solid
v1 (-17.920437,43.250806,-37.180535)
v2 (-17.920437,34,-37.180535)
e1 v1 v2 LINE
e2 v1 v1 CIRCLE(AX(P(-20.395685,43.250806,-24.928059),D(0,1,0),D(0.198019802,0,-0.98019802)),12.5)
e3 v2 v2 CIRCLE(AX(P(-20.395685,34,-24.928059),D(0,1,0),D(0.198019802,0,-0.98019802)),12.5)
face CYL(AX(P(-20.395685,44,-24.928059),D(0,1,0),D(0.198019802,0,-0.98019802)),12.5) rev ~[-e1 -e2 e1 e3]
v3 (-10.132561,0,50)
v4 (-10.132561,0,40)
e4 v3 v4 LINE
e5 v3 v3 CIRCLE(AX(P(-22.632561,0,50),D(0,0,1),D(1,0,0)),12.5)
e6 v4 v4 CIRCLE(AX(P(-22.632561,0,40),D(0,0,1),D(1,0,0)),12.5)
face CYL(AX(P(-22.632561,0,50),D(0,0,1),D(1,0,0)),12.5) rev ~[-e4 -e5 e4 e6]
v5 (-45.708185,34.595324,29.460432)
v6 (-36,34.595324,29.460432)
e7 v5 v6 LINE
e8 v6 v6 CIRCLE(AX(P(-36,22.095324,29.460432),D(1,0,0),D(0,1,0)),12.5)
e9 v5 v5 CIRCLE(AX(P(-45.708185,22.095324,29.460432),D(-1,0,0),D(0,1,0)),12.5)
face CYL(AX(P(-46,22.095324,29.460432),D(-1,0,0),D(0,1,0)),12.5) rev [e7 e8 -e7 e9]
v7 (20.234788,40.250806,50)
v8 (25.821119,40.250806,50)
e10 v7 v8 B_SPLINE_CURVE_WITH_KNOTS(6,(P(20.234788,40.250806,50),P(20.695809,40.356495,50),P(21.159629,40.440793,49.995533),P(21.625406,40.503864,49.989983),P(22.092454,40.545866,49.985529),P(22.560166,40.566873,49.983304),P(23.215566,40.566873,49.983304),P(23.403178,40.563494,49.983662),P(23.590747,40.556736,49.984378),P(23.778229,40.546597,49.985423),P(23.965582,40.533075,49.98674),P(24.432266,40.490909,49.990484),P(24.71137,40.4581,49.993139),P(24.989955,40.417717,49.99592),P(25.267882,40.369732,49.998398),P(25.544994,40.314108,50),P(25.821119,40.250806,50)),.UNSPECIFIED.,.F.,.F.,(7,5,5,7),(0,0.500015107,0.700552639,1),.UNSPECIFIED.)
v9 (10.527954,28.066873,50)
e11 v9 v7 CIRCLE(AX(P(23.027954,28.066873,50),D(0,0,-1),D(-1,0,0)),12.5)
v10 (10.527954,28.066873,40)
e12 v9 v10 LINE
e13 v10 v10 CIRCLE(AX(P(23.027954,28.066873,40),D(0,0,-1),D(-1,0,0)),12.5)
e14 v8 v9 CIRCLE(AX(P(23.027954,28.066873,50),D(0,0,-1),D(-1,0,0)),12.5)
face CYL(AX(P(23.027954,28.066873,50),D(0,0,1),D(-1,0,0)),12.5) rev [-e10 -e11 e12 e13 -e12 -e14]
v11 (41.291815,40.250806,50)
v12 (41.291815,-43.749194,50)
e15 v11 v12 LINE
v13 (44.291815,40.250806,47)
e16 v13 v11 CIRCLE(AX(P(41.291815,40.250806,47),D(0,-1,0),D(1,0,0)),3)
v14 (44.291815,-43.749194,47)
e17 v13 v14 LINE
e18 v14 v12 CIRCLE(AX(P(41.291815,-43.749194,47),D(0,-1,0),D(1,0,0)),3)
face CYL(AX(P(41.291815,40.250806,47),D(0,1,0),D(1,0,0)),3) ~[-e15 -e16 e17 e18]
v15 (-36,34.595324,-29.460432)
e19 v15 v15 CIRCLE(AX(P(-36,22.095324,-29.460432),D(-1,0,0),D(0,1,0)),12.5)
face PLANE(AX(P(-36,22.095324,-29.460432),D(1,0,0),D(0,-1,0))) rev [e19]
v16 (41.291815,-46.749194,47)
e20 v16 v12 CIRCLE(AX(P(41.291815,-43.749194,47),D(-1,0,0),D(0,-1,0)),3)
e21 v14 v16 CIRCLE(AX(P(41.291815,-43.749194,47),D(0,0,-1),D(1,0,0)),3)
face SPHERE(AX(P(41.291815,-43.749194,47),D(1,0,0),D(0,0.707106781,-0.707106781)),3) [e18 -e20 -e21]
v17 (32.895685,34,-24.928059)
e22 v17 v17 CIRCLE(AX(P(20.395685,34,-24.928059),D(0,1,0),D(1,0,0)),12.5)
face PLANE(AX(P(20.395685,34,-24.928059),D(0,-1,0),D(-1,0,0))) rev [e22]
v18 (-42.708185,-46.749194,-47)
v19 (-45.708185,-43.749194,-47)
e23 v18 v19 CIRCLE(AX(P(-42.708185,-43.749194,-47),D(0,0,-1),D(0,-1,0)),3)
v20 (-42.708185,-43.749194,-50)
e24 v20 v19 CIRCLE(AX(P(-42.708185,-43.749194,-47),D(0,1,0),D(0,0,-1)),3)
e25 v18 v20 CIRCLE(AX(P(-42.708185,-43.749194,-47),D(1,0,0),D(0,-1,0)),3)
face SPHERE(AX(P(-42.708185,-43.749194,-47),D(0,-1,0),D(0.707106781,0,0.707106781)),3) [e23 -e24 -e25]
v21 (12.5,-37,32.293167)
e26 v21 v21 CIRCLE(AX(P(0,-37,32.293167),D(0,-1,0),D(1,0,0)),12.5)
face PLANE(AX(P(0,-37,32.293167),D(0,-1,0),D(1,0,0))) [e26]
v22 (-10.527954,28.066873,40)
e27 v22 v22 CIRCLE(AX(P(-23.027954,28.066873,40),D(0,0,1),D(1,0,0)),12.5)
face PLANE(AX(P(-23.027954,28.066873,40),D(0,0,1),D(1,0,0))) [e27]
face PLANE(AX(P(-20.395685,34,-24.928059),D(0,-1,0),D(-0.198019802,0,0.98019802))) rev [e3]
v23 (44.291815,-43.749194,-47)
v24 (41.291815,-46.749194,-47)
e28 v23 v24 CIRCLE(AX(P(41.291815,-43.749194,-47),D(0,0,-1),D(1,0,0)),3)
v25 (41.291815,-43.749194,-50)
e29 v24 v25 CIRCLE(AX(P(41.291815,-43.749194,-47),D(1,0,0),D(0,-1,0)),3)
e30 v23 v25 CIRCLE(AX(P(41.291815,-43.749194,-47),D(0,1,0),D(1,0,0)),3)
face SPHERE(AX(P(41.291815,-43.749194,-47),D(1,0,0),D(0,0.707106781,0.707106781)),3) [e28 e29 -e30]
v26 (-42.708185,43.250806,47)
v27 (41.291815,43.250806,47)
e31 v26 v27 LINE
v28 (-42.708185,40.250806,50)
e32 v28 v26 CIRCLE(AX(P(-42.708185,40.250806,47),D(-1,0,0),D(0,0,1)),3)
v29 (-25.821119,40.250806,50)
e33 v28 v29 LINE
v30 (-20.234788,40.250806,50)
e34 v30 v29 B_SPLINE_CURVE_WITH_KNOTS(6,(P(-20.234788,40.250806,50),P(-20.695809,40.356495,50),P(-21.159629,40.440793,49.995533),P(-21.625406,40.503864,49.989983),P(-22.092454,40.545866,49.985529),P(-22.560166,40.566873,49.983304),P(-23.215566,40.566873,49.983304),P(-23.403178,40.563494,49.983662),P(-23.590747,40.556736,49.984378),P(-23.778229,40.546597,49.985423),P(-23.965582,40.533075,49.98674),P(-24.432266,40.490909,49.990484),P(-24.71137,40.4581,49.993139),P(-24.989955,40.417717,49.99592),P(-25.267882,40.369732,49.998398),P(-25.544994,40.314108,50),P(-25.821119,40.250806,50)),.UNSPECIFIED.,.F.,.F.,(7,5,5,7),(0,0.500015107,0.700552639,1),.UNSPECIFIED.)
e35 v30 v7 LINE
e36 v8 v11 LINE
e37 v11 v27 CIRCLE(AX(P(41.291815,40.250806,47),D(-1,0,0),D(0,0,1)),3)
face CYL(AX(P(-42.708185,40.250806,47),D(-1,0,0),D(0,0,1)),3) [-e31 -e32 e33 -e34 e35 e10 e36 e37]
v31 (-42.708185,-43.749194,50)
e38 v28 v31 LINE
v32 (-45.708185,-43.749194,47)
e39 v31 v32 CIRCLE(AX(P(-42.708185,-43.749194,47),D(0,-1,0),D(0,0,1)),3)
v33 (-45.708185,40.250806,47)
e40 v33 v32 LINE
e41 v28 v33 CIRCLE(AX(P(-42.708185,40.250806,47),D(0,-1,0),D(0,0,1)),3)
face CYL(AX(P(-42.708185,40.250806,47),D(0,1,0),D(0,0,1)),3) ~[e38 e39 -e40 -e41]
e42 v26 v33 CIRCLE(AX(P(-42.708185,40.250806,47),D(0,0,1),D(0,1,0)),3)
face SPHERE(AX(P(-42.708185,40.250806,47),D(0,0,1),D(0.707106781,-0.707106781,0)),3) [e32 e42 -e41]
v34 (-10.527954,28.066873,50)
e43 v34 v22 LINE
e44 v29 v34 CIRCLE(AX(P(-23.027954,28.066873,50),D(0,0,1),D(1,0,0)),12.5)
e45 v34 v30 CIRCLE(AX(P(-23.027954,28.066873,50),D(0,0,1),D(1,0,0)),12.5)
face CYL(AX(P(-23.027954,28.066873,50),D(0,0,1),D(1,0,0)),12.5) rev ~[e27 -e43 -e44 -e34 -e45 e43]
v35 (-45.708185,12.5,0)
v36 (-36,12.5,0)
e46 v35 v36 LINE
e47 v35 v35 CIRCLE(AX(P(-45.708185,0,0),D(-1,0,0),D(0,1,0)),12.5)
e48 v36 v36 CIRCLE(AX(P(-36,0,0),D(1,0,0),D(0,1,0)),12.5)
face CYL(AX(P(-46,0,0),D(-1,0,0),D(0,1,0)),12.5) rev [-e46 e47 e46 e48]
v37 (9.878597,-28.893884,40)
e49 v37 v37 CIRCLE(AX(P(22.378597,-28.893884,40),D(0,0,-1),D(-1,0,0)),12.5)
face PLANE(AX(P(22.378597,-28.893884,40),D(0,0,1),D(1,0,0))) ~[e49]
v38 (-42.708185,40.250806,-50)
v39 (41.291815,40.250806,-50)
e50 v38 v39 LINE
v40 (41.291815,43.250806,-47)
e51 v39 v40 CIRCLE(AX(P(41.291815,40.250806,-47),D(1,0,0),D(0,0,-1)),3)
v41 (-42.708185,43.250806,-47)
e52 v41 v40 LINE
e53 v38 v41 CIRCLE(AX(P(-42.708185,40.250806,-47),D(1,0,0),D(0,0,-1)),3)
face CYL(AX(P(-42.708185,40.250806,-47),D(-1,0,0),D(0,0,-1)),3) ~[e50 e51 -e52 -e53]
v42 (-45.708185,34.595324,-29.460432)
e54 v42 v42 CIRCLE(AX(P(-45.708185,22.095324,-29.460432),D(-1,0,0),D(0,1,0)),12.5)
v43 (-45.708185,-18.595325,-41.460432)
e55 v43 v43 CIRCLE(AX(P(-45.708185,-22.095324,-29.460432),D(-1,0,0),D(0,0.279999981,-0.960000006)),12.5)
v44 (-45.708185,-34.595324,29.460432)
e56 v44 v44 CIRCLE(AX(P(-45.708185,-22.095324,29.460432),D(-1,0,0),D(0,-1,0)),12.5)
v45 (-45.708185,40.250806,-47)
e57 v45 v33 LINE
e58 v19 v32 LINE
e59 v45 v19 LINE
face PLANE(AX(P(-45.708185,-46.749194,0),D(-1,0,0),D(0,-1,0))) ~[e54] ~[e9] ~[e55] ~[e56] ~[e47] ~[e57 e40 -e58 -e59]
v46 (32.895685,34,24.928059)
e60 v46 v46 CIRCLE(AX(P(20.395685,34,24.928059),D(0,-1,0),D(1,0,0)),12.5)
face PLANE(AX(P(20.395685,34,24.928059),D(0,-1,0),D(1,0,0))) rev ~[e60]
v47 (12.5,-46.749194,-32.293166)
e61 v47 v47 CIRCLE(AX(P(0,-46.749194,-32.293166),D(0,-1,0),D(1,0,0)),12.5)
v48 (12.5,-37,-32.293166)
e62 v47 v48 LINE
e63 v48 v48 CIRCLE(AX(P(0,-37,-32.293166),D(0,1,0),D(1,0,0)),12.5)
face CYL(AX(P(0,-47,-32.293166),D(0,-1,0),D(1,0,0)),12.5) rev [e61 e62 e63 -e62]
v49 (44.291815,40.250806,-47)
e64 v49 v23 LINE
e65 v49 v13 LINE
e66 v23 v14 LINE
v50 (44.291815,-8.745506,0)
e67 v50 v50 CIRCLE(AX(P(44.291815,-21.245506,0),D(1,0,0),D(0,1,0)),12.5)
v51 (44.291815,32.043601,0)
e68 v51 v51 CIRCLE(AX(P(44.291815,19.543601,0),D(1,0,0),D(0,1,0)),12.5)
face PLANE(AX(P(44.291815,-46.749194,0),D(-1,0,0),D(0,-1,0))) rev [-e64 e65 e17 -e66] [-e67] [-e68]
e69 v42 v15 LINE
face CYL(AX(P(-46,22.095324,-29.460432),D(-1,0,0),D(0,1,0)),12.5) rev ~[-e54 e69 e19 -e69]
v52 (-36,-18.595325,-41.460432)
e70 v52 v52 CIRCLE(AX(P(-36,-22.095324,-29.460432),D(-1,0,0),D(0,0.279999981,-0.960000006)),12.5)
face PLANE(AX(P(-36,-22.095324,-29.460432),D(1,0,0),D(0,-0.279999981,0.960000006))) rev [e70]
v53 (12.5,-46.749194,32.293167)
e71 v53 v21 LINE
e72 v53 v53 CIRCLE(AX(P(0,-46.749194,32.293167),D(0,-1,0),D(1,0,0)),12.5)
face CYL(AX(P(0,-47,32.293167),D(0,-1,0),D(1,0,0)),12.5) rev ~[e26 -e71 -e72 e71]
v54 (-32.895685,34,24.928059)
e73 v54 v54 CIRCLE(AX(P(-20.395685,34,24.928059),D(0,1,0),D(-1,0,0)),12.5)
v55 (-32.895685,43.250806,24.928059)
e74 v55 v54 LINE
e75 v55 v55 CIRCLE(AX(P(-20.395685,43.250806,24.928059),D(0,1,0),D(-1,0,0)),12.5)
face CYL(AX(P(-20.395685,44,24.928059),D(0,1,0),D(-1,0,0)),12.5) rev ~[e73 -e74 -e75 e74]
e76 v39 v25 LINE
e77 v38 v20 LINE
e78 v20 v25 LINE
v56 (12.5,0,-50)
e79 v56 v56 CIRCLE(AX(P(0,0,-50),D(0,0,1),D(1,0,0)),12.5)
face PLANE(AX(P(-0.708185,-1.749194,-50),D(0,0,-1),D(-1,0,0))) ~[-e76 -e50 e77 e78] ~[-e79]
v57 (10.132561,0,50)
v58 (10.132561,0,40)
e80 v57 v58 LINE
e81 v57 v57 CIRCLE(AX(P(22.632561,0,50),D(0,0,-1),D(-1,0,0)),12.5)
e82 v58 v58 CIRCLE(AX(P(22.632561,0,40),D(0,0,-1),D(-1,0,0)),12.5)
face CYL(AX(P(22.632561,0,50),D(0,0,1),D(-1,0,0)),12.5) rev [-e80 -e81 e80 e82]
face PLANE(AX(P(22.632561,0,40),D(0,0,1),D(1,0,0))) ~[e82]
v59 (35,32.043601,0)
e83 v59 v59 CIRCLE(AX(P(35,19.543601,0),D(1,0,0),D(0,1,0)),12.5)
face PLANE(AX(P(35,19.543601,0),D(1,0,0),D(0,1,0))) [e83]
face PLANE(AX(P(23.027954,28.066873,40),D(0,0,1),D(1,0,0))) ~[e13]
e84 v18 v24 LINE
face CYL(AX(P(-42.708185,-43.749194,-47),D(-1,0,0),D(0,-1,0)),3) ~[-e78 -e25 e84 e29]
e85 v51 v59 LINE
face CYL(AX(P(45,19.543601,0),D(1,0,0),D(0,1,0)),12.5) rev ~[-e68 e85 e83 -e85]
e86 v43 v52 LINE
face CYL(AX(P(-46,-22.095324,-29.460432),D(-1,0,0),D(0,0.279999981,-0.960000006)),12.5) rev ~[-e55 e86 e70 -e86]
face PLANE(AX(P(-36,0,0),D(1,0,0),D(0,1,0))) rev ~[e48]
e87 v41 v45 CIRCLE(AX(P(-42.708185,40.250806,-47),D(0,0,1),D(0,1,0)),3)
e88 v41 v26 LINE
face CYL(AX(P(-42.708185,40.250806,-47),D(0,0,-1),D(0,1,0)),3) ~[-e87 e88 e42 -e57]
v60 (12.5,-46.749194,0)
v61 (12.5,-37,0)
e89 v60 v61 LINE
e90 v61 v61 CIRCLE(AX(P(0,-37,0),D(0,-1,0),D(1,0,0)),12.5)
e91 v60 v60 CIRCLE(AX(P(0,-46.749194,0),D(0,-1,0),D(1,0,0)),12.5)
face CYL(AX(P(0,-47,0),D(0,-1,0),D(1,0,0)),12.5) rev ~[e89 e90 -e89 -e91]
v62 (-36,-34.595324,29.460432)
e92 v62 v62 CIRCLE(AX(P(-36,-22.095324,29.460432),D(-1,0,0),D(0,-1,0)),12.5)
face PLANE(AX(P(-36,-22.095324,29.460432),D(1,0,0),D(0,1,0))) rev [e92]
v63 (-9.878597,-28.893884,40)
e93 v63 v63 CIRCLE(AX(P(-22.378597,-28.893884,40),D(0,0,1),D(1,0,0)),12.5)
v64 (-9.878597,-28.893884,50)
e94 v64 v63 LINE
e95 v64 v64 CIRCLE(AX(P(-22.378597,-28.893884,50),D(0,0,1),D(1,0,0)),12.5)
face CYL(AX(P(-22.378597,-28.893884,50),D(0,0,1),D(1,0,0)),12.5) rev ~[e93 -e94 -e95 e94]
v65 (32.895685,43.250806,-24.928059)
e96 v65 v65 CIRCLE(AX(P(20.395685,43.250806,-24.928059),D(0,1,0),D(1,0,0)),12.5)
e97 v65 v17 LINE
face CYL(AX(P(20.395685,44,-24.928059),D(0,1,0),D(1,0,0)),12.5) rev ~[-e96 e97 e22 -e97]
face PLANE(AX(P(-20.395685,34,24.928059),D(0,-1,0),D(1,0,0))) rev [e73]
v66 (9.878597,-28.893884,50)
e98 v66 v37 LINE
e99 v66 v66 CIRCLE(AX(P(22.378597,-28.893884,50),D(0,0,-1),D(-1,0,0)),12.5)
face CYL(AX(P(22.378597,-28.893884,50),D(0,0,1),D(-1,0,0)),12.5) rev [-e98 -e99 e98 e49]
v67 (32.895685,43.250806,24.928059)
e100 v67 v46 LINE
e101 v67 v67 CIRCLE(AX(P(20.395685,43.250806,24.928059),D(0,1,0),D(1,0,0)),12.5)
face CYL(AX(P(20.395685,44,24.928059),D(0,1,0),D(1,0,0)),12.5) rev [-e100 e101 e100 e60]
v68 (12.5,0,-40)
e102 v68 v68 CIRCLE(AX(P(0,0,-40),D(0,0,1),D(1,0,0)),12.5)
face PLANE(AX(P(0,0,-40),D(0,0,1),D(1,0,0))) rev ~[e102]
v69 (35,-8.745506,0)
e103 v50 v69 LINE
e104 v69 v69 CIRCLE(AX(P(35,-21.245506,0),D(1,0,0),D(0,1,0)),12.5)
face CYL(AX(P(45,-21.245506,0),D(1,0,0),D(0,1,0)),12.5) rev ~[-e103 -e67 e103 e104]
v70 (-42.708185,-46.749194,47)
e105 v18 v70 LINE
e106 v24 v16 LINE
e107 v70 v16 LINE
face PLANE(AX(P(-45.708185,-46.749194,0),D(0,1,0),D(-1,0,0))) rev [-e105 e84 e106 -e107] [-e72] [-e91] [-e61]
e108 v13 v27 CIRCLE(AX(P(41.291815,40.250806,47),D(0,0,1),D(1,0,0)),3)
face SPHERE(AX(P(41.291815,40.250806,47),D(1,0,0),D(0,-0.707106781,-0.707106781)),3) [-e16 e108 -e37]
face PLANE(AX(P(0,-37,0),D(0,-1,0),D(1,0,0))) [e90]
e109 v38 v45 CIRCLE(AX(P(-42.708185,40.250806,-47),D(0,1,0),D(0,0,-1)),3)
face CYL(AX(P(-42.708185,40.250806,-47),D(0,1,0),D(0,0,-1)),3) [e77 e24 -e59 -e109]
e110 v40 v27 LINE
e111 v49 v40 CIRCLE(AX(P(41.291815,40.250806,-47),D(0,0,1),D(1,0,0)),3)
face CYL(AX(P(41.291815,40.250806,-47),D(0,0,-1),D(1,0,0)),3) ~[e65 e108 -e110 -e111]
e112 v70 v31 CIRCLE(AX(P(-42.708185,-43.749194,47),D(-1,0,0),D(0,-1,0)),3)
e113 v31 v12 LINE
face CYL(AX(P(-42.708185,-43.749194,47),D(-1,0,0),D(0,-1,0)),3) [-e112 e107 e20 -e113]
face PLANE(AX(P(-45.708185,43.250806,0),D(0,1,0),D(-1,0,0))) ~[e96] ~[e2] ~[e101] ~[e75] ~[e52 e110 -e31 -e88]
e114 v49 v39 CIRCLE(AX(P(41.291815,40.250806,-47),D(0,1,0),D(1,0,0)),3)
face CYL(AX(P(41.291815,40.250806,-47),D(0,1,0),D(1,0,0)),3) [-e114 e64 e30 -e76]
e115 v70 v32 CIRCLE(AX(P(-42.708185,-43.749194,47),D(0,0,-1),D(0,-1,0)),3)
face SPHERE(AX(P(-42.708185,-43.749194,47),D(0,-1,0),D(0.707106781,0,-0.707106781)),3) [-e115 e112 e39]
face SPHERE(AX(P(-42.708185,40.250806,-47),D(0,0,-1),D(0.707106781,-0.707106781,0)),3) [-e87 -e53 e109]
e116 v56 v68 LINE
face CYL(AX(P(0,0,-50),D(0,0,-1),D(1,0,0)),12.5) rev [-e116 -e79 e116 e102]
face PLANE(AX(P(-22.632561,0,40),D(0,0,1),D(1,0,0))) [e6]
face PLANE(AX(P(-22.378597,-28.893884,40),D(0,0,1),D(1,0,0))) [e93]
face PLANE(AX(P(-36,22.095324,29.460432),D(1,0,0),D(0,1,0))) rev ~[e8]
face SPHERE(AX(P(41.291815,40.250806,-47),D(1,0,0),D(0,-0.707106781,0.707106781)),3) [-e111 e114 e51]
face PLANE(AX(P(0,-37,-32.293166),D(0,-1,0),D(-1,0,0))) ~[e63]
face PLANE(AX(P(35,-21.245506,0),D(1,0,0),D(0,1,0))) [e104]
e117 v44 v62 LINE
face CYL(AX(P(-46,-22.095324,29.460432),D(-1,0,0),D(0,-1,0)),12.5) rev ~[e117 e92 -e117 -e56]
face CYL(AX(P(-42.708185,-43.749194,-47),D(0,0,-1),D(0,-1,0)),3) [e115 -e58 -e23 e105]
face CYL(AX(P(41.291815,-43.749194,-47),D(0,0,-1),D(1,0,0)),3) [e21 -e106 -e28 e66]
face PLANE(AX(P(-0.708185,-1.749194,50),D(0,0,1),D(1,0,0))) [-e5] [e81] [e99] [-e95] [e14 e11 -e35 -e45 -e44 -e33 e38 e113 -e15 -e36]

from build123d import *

# Parameters (mm, degrees)
F0_W          = 90
F0_H          = 90
F1_DEPTH      = 50
F5_R          = 12.5
F6_DEPTH      = 10
F7_R          = 12.5
F8_DEPTH      = 10
F9_R          = 12.5
F10_DEPTH     = 10
F11_R         = 12.5
F12_DEPTH     = 10
F15_R         = 12.5
F16_DEPTH     = 10
F17_R         = 12.5
F18_DEPTH     = 10
F19_R         = 12.5
F20_DEPTH     = 10
F21_R         = 12.5
F22_DEPTH     = 10
F25_R         = 12.5
F26_DEPTH     = 10
F27_R         = 12.5
F28_DEPTH     = 10
F29_R         = 12.5
F30_DEPTH     = 10
F31_T1_DEPTH  = 84
F31_T3_DEPTH  = 94
F31_T5_DEPTH  = 84
F31_S9_W      = 3
F31_S9_H      = 3
F31_T10_DEPTH = 3
F31_S15_W     = 3
F31_S15_H     = 3
F31_T16_DEPTH = 3
F31_S21_W     = 3
F31_S21_H     = 3
F31_T22_DEPTH = 3
F31_S27_W     = 3
F31_S27_H     = 3
F31_T28_DEPTH = 3
F31_S33_W     = 3
F31_S33_H     = 3
F31_T34_DEPTH = 3
F31_S39_W     = 3
F31_S39_H     = 3
F31_T40_DEPTH = 3
F31_S45_W     = 3
F31_S45_H     = 3
F31_T46_DEPTH = 3
F31_S51_W     = 3
F31_S51_H     = 3
F31_T52_DEPTH = 3


# Not quite as in the source:
# - a fillet or chamfer that OpenCascade refuses, or shapes differently, is made with other operations: its cross-section is extruded or revolved along the edge and cut away or added
# - a pattern or mirror of a feature is missing from the dataset's text; its kind, count and spacing are read off the source's solid


with BuildPart() as f1:
    # F0 (on Top) → F1 (new body)
    with BuildSketch(Plane.XY):
        with Locations((-0.7081851363, -1.7491936245)):
            Rectangle(F0_W, F0_H)
    extrude(amount=F1_DEPTH)

    # F2: F1 across plane


with BuildPart() as f1_1:
    add(f1.part)
    add(f1.part.mirror(Plane.XY))

    # F5 (on offset) → F6 (cut)
    with BuildSketch(Plane.XY.offset(-50)):
        Circle(F5_R)
    extrude(amount=F6_DEPTH, mode=Mode.SUBTRACT)

    # F7 (on offset) → F8 (cut)
    with BuildSketch(Plane.XY.offset(50)):
        with Locations((-22.6325611251, 0)):
            Circle(F7_R)
    f8 = extrude(amount=-F8_DEPTH, mode=Mode.SUBTRACT)

    # F8_copies: F8 across plane
    add(f8.mirror(Plane(origin=(0, 0, 0), x_dir=(0, 0, 1), z_dir=(1, 0, 0))), mode=Mode.SUBTRACT)

    # F9 (on offset) → F10 (cut)
    with BuildSketch(Plane.XY.offset(50)):
        with Locations((-23.0279536654, 28.0668731955)):
            Circle(F9_R)
    f10 = extrude(amount=-F10_DEPTH, mode=Mode.SUBTRACT)

    # F10_copies: F10 across plane
    add(f10.mirror(Plane(origin=(0, 0, 0), x_dir=(0, 0, 1), z_dir=(1, 0, 0))), mode=Mode.SUBTRACT)

    # F11 (on offset) → F12 (cut)
    with BuildSketch(Plane.XY.offset(50)):
        with Locations((-22.3785974085, -28.8938842714)):
            Circle(F11_R)
    f12 = extrude(amount=-F12_DEPTH, mode=Mode.SUBTRACT)

    # F12_copies: F12 across plane
    add(f12.mirror(Plane(origin=(0, 0, 0), x_dir=(0, 0, 1), z_dir=(1, 0, 0))), mode=Mode.SUBTRACT)

    # F15 (on offset) → F16 (cut)
    with BuildSketch(Plane.YZ.offset(45)):
        with Locations((-21.2455056608, 0)):
            Circle(F15_R)
    extrude(amount=-F16_DEPTH, mode=Mode.SUBTRACT)

    # F17 (on offset) → F18 (cut)
    with BuildSketch(Plane.YZ.offset(45)):
        with Locations((19.5436013028, 0)):
            Circle(F17_R)
    extrude(amount=-F18_DEPTH, mode=Mode.SUBTRACT)

    # F19 (on offset) → F20 (cut)
    with BuildSketch(Plane.YZ.offset(-46)):
        Circle(F19_R)
    extrude(amount=F20_DEPTH, mode=Mode.SUBTRACT)

    # F21 (on offset) → F22 (cut)
    with BuildSketch(Plane.YZ.offset(-46)):
        with Locations((22.0953244716, 29.4604320079)):
            Circle(F21_R)
    f22 = extrude(amount=F22_DEPTH, mode=Mode.SUBTRACT)

    # F22_copies: F22 across plane
    add(f22.mirror(Plane(origin=(0, 0, 0), x_dir=(0, -0.7999999939, 0.6000000081), z_dir=(0, -0.6000000081, -0.7999999939))), mode=Mode.SUBTRACT)

    # F22_copies1: F22 across plane
    add(f22.mirror(Plane(origin=(0, 0, 0), x_dir=(0, 0, -1), z_dir=(0, -1, 0))), mode=Mode.SUBTRACT)

    # F22_copies2: F22 across plane
    add(f22.mirror(Plane(origin=(0, 0, 0), x_dir=(-1, 0, 0), z_dir=(0, 0, -1))), mode=Mode.SUBTRACT)

    # F25 (on offset) → F26 (cut)
    with BuildSketch(Plane.XZ.offset(47)):
        Circle(F25_R)
    f26 = extrude(amount=-F26_DEPTH, mode=Mode.SUBTRACT)

    # F26_copies: F26 across plane
    add(f26.mirror(Plane(origin=(0, 0, -16.146583), x_dir=(-1, 0, 0), z_dir=(0, 0, -1))), mode=Mode.SUBTRACT)

    # F27 (on offset) → F28 (cut)
    with BuildSketch(Plane.XZ.offset(47)):
        with Locations((0, 32.2931669652)):
            Circle(F27_R)
    extrude(amount=-F28_DEPTH, mode=Mode.SUBTRACT)

    # F29 (on offset) → F30 (cut)
    with BuildSketch(Plane.XZ.offset(-44)):
        with Locations((20.3956849873, 24.9280594289)):
            Circle(F29_R)
    f30 = extrude(amount=F30_DEPTH, mode=Mode.SUBTRACT)

    # F30_copies: F30 across plane
    add(f30.mirror(Plane(origin=(0, 0, 0), x_dir=(-1, 0, 0), z_dir=(0, 0, -1))), mode=Mode.SUBTRACT)

    # F30_copies1: F30 across plane
    add(f30.mirror(Plane(origin=(0, 0, 0), x_dir=(0, 0, -1), z_dir=(-1, 0, 0))), mode=Mode.SUBTRACT)

    # F30_copies2: F30 across plane
    add(f30.mirror(Plane(origin=(0, 0, 0), x_dir=(-0.7739572992, 0, 0.6332377903), z_dir=(-0.6332377903, 0, -0.7739572992))), mode=Mode.SUBTRACT)

    # F31: fillet of radius 3 on 12 edges, made by hand

    # F31_s2 → F31_t1 (cut)
    with BuildSketch(Plane.XZ.offset(-40.2508063755)):
        with BuildLine():
            ThreePointArc((44.2918148637, 47), (43.4131352072, 49.1213203436), (41.2918148637, 50))
            Line((41.2918148637, 50), (44.2918148637, 50))
            Line((44.2918148637, 50), (44.2918148637, 47))
        make_face()
        with BuildLine():
            ThreePointArc((44.2918148637, -47), (43.4131352072, -49.1213203436), (41.2918148637, -50))
            Line((41.2918148637, -50), (44.2918148637, -50))
            Line((44.2918148637, -50), (44.2918148637, -47))
        make_face()
        with BuildLine():
            ThreePointArc((-42.7081851363, 50), (-44.8295054799, 49.1213203436), (-45.7081851363, 47))
            Line((-45.7081851363, 47), (-45.7081851363, 50))
            Line((-45.7081851363, 50), (-42.7081851363, 50))
        make_face()
        with BuildLine():
            ThreePointArc((-42.7081851363, -50), (-44.8295054799, -49.1213203436), (-45.7081851363, -47))
            Line((-45.7081851363, -47), (-45.7081851363, -50))
            Line((-45.7081851363, -50), (-42.7081851363, -50))
        make_face()
    extrude(amount=F31_T1_DEPTH, mode=Mode.SUBTRACT)

    # F31_s4 → F31_t3 (cut)
    with BuildSketch(Plane.XY.offset(-47)):
        with BuildLine():
            ThreePointArc((44.2918148637, -43.7491936245), (43.4131352072, -45.870513968), (41.2918148637, -46.7491936245))
            Line((41.2918148637, -46.7491936245), (44.2918148637, -46.7491936245))
            Line((44.2918148637, -46.7491936245), (44.2918148637, -43.7491936245))
        make_face()
        with BuildLine():
            ThreePointArc((44.2918148637, 40.2508063755), (43.4131352072, 42.3721267191), (41.2918148637, 43.2508063755))
            Line((41.2918148637, 43.2508063755), (44.2918148637, 43.2508063755))
            Line((44.2918148637, 43.2508063755), (44.2918148637, 40.2508063755))
        make_face()
        with BuildLine():
            ThreePointArc((-42.7081851363, 43.2508063755), (-44.8295054799, 42.3721267191), (-45.7081851363, 40.2508063755))
            Line((-45.7081851363, 40.2508063755), (-45.7081851363, 43.2508063755))
            Line((-45.7081851363, 43.2508063755), (-42.7081851363, 43.2508063755))
        make_face()
        with BuildLine():
            ThreePointArc((-42.7081851363, -46.7491936245), (-44.8295054799, -45.870513968), (-45.7081851363, -43.7491936245))
            Line((-45.7081851363, -43.7491936245), (-45.7081851363, -46.7491936245))
            Line((-45.7081851363, -46.7491936245), (-42.7081851363, -46.7491936245))
        make_face()
    extrude(amount=F31_T3_DEPTH, mode=Mode.SUBTRACT)

    # F31_s6 → F31_t5 (cut)
    with BuildSketch(Plane.YZ.offset(-42.7081851363)):
        with BuildLine():
            ThreePointArc((40.2508063755, -50), (42.3721267191, -49.1213203436), (43.2508063755, -47))
            Line((43.2508063755, -47), (43.2508063755, -50))
            Line((43.2508063755, -50), (40.2508063755, -50))
        make_face()
        with BuildLine():
            ThreePointArc((40.2508063755, 50), (42.3721267191, 49.1213203436), (43.2508063755, 47))
            Line((43.2508063755, 47), (43.2508063755, 50))
            Line((43.2508063755, 50), (40.2508063755, 50))
        make_face()
        with BuildLine():
            ThreePointArc((-46.7491936245, 47), (-45.870513968, 49.1213203436), (-43.7491936245, 50))
            Line((-43.7491936245, 50), (-46.7491936245, 50))
            Line((-46.7491936245, 50), (-46.7491936245, 47))
        make_face()
        with BuildLine():
            ThreePointArc((-46.7491936245, -47), (-45.870513968, -49.1213203436), (-43.7491936245, -50))
            Line((-43.7491936245, -50), (-46.7491936245, -50))
            Line((-46.7491936245, -50), (-46.7491936245, -47))
        make_face()
    extrude(amount=F31_T5_DEPTH, mode=Mode.SUBTRACT)


with BuildPart() as f31_tool8:
    # F31_s9 → F31_t10 (new body)
    with BuildSketch(Plane.YZ.offset(41.2918148637)):
        with Locations((-45.2491936245, 48.5)):
            Rectangle(F31_S9_W, F31_S9_H)
    extrude(amount=F31_T10_DEPTH)

    # F31_s11 → F31_t12 (revolve, cut)
    with BuildSketch(Plane(origin=(41.2918148637, -43.7491936245, 47), x_dir=(0, 0.7071067812, -0.7071067812), z_dir=(0, -0.7071067812, -0.7071067812))):
        with BuildLine():
            ThreePointArc((0, -3), (3, 0), (0, 3))
            Line((0, 3), (0, -3))
        make_face()
    revolve(axis=Axis((41.2918148637, -43.7491936245, 47), (1, 0, 0)), mode=Mode.SUBTRACT)


with BuildPart() as f1_2:
    add(f1_1.part)

    # F31_t7: cut F31_tool8
    add(f31_tool8.part, mode=Mode.SUBTRACT)


with BuildPart() as f31_tool14:
    # F31_s15 → F31_t16 (new body)
    with BuildSketch(Plane.YZ.offset(41.2918148637)):
        with Locations((41.7508063755, 48.5)):
            Rectangle(F31_S15_W, F31_S15_H)
    extrude(amount=F31_T16_DEPTH)

    # F31_s17 → F31_t18 (revolve, cut)
    with BuildSketch(Plane(origin=(41.2918148637, 40.2508063755, 47), x_dir=(0, -0.7071067812, -0.7071067812), z_dir=(0, -0.7071067812, 0.7071067812))):
        with BuildLine():
            ThreePointArc((0, -3), (3, 0), (0, 3))
            Line((0, 3), (0, -3))
        make_face()
    revolve(axis=Axis((41.2918148637, 40.2508063755, 47), (1, 0, 0)), mode=Mode.SUBTRACT)


with BuildPart() as f1_3:
    add(f1_2.part)

    # F31_t13: cut F31_tool14
    add(f31_tool14.part, mode=Mode.SUBTRACT)


with BuildPart() as f31_tool20:
    # F31_s21 → F31_t22 (new body)
    with BuildSketch(Plane.YZ.offset(41.2918148637)):
        with Locations((-45.2491936245, -48.5)):
            Rectangle(F31_S21_W, F31_S21_H)
    extrude(amount=F31_T22_DEPTH)

    # F31_s23 → F31_t24 (revolve, cut)
    with BuildSketch(Plane(origin=(41.2918148637, -43.7491936245, -47), x_dir=(0, 0.7071067812, 0.7071067812), z_dir=(0, 0.7071067812, -0.7071067812))):
        with BuildLine():
            ThreePointArc((0, -3), (3, 0), (0, 3))
            Line((0, 3), (0, -3))
        make_face()
    revolve(axis=Axis((41.2918148637, -43.7491936245, -47), (1, 0, 0)), mode=Mode.SUBTRACT)


with BuildPart() as f1_4:
    add(f1_3.part)

    # F31_t19: cut F31_tool20
    add(f31_tool20.part, mode=Mode.SUBTRACT)


with BuildPart() as f31_tool26:
    # F31_s27 → F31_t28 (new body)
    with BuildSketch(Plane.YZ.offset(41.2918148637)):
        with Locations((41.7508063755, -48.5)):
            Rectangle(F31_S27_W, F31_S27_H)
    extrude(amount=F31_T28_DEPTH)

    # F31_s29 → F31_t30 (revolve, cut)
    with BuildSketch(Plane(origin=(41.2918148637, 40.2508063755, -47), x_dir=(0, -0.7071067812, 0.7071067812), z_dir=(0, 0.7071067812, 0.7071067812))):
        with BuildLine():
            ThreePointArc((0, -3), (3, 0), (0, 3))
            Line((0, 3), (0, -3))
        make_face()
    revolve(axis=Axis((41.2918148637, 40.2508063755, -47), (1, 0, 0)), mode=Mode.SUBTRACT)


with BuildPart() as f1_5:
    add(f1_4.part)

    # F31_t25: cut F31_tool26
    add(f31_tool26.part, mode=Mode.SUBTRACT)


with BuildPart() as f31_tool32:
    # F31_s33 → F31_t34 (new body)
    with BuildSketch(Plane.XY.offset(-47)):
        with Locations((-44.2081851363, 41.7508063755)):
            Rectangle(F31_S33_W, F31_S33_H)
    extrude(amount=-F31_T34_DEPTH)

    # F31_s35 → F31_t36 (revolve, cut)
    with BuildSketch(Plane(origin=(-42.7081851363, 40.2508063755, -47), x_dir=(0.7071067812, -0.7071067812, 0), z_dir=(0.7071067812, 0.7071067812, 0))):
        with BuildLine():
            ThreePointArc((0, -3), (3, 0), (0, 3))
            Line((0, 3), (0, -3))
        make_face()
    revolve(axis=Axis((-42.7081851363, 40.2508063755, -47), (0, 0, -1)), mode=Mode.SUBTRACT)


with BuildPart() as f1_6:
    add(f1_5.part)

    # F31_t31: cut F31_tool32
    add(f31_tool32.part, mode=Mode.SUBTRACT)


with BuildPart() as f31_tool38:
    # F31_s39 → F31_t40 (new body)
    with BuildSketch(Plane.XY.offset(47)):
        with Locations((-44.2081851363, 41.7508063755)):
            Rectangle(F31_S39_W, F31_S39_H)
    extrude(amount=F31_T40_DEPTH)

    # F31_s41 → F31_t42 (revolve, cut)
    with BuildSketch(Plane(origin=(-42.7081851363, 40.2508063755, 47), x_dir=(0.7071067812, -0.7071067812, 0), z_dir=(-0.7071067812, -0.7071067812, 0))):
        with BuildLine():
            ThreePointArc((0, -3), (3, 0), (0, 3))
            Line((0, 3), (0, -3))
        make_face()
    revolve(axis=Axis((-42.7081851363, 40.2508063755, 47), (0, 0, 1)), mode=Mode.SUBTRACT)


with BuildPart() as f1_7:
    add(f1_6.part)

    # F31_t37: cut F31_tool38
    add(f31_tool38.part, mode=Mode.SUBTRACT)


with BuildPart() as f31_tool44:
    # F31_s45 → F31_t46 (new body)
    with BuildSketch(Plane.XZ.offset(43.7491936245)):
        with Locations((-44.2081851363, 48.5)):
            Rectangle(F31_S45_W, F31_S45_H)
    extrude(amount=F31_T46_DEPTH)

    # F31_s47 → F31_t48 (revolve, cut)
    with BuildSketch(Plane(origin=(-42.7081851363, -43.7491936245, 47), x_dir=(0.7071067812, 0, -0.7071067812), z_dir=(-0.7071067812, 0, -0.7071067812))):
        with BuildLine():
            ThreePointArc((0, -3), (3, 0), (0, 3))
            Line((0, 3), (0, -3))
        make_face()
    revolve(axis=Axis((-42.7081851363, -43.7491936245, 47), (0, -1, 0)), mode=Mode.SUBTRACT)


with BuildPart() as f1_8:
    add(f1_7.part)

    # F31_t43: cut F31_tool44
    add(f31_tool44.part, mode=Mode.SUBTRACT)


with BuildPart() as f31_tool50:
    # F31_s51 → F31_t52 (new body)
    with BuildSketch(Plane.XZ.offset(43.7491936245)):
        with Locations((-44.2081851363, -48.5)):
            Rectangle(F31_S51_W, F31_S51_H)
    extrude(amount=F31_T52_DEPTH)

    # F31_s53 → F31_t54 (revolve, cut)
    with BuildSketch(Plane(origin=(-42.7081851363, -43.7491936245, -47), x_dir=(0.7071067812, 0, 0.7071067812), z_dir=(0.7071067812, 0, -0.7071067812))):
        with BuildLine():
            ThreePointArc((0, -3), (3, 0), (0, 3))
            Line((0, 3), (0, -3))
        make_face()
    revolve(axis=Axis((-42.7081851363, -43.7491936245, -47), (0, -1, 0)), mode=Mode.SUBTRACT)


with BuildPart() as f1_9:
    add(f1_8.part)

    # F31_t49: cut F31_tool50
    add(f31_tool50.part, mode=Mode.SUBTRACT)


solid = f1_9.part
